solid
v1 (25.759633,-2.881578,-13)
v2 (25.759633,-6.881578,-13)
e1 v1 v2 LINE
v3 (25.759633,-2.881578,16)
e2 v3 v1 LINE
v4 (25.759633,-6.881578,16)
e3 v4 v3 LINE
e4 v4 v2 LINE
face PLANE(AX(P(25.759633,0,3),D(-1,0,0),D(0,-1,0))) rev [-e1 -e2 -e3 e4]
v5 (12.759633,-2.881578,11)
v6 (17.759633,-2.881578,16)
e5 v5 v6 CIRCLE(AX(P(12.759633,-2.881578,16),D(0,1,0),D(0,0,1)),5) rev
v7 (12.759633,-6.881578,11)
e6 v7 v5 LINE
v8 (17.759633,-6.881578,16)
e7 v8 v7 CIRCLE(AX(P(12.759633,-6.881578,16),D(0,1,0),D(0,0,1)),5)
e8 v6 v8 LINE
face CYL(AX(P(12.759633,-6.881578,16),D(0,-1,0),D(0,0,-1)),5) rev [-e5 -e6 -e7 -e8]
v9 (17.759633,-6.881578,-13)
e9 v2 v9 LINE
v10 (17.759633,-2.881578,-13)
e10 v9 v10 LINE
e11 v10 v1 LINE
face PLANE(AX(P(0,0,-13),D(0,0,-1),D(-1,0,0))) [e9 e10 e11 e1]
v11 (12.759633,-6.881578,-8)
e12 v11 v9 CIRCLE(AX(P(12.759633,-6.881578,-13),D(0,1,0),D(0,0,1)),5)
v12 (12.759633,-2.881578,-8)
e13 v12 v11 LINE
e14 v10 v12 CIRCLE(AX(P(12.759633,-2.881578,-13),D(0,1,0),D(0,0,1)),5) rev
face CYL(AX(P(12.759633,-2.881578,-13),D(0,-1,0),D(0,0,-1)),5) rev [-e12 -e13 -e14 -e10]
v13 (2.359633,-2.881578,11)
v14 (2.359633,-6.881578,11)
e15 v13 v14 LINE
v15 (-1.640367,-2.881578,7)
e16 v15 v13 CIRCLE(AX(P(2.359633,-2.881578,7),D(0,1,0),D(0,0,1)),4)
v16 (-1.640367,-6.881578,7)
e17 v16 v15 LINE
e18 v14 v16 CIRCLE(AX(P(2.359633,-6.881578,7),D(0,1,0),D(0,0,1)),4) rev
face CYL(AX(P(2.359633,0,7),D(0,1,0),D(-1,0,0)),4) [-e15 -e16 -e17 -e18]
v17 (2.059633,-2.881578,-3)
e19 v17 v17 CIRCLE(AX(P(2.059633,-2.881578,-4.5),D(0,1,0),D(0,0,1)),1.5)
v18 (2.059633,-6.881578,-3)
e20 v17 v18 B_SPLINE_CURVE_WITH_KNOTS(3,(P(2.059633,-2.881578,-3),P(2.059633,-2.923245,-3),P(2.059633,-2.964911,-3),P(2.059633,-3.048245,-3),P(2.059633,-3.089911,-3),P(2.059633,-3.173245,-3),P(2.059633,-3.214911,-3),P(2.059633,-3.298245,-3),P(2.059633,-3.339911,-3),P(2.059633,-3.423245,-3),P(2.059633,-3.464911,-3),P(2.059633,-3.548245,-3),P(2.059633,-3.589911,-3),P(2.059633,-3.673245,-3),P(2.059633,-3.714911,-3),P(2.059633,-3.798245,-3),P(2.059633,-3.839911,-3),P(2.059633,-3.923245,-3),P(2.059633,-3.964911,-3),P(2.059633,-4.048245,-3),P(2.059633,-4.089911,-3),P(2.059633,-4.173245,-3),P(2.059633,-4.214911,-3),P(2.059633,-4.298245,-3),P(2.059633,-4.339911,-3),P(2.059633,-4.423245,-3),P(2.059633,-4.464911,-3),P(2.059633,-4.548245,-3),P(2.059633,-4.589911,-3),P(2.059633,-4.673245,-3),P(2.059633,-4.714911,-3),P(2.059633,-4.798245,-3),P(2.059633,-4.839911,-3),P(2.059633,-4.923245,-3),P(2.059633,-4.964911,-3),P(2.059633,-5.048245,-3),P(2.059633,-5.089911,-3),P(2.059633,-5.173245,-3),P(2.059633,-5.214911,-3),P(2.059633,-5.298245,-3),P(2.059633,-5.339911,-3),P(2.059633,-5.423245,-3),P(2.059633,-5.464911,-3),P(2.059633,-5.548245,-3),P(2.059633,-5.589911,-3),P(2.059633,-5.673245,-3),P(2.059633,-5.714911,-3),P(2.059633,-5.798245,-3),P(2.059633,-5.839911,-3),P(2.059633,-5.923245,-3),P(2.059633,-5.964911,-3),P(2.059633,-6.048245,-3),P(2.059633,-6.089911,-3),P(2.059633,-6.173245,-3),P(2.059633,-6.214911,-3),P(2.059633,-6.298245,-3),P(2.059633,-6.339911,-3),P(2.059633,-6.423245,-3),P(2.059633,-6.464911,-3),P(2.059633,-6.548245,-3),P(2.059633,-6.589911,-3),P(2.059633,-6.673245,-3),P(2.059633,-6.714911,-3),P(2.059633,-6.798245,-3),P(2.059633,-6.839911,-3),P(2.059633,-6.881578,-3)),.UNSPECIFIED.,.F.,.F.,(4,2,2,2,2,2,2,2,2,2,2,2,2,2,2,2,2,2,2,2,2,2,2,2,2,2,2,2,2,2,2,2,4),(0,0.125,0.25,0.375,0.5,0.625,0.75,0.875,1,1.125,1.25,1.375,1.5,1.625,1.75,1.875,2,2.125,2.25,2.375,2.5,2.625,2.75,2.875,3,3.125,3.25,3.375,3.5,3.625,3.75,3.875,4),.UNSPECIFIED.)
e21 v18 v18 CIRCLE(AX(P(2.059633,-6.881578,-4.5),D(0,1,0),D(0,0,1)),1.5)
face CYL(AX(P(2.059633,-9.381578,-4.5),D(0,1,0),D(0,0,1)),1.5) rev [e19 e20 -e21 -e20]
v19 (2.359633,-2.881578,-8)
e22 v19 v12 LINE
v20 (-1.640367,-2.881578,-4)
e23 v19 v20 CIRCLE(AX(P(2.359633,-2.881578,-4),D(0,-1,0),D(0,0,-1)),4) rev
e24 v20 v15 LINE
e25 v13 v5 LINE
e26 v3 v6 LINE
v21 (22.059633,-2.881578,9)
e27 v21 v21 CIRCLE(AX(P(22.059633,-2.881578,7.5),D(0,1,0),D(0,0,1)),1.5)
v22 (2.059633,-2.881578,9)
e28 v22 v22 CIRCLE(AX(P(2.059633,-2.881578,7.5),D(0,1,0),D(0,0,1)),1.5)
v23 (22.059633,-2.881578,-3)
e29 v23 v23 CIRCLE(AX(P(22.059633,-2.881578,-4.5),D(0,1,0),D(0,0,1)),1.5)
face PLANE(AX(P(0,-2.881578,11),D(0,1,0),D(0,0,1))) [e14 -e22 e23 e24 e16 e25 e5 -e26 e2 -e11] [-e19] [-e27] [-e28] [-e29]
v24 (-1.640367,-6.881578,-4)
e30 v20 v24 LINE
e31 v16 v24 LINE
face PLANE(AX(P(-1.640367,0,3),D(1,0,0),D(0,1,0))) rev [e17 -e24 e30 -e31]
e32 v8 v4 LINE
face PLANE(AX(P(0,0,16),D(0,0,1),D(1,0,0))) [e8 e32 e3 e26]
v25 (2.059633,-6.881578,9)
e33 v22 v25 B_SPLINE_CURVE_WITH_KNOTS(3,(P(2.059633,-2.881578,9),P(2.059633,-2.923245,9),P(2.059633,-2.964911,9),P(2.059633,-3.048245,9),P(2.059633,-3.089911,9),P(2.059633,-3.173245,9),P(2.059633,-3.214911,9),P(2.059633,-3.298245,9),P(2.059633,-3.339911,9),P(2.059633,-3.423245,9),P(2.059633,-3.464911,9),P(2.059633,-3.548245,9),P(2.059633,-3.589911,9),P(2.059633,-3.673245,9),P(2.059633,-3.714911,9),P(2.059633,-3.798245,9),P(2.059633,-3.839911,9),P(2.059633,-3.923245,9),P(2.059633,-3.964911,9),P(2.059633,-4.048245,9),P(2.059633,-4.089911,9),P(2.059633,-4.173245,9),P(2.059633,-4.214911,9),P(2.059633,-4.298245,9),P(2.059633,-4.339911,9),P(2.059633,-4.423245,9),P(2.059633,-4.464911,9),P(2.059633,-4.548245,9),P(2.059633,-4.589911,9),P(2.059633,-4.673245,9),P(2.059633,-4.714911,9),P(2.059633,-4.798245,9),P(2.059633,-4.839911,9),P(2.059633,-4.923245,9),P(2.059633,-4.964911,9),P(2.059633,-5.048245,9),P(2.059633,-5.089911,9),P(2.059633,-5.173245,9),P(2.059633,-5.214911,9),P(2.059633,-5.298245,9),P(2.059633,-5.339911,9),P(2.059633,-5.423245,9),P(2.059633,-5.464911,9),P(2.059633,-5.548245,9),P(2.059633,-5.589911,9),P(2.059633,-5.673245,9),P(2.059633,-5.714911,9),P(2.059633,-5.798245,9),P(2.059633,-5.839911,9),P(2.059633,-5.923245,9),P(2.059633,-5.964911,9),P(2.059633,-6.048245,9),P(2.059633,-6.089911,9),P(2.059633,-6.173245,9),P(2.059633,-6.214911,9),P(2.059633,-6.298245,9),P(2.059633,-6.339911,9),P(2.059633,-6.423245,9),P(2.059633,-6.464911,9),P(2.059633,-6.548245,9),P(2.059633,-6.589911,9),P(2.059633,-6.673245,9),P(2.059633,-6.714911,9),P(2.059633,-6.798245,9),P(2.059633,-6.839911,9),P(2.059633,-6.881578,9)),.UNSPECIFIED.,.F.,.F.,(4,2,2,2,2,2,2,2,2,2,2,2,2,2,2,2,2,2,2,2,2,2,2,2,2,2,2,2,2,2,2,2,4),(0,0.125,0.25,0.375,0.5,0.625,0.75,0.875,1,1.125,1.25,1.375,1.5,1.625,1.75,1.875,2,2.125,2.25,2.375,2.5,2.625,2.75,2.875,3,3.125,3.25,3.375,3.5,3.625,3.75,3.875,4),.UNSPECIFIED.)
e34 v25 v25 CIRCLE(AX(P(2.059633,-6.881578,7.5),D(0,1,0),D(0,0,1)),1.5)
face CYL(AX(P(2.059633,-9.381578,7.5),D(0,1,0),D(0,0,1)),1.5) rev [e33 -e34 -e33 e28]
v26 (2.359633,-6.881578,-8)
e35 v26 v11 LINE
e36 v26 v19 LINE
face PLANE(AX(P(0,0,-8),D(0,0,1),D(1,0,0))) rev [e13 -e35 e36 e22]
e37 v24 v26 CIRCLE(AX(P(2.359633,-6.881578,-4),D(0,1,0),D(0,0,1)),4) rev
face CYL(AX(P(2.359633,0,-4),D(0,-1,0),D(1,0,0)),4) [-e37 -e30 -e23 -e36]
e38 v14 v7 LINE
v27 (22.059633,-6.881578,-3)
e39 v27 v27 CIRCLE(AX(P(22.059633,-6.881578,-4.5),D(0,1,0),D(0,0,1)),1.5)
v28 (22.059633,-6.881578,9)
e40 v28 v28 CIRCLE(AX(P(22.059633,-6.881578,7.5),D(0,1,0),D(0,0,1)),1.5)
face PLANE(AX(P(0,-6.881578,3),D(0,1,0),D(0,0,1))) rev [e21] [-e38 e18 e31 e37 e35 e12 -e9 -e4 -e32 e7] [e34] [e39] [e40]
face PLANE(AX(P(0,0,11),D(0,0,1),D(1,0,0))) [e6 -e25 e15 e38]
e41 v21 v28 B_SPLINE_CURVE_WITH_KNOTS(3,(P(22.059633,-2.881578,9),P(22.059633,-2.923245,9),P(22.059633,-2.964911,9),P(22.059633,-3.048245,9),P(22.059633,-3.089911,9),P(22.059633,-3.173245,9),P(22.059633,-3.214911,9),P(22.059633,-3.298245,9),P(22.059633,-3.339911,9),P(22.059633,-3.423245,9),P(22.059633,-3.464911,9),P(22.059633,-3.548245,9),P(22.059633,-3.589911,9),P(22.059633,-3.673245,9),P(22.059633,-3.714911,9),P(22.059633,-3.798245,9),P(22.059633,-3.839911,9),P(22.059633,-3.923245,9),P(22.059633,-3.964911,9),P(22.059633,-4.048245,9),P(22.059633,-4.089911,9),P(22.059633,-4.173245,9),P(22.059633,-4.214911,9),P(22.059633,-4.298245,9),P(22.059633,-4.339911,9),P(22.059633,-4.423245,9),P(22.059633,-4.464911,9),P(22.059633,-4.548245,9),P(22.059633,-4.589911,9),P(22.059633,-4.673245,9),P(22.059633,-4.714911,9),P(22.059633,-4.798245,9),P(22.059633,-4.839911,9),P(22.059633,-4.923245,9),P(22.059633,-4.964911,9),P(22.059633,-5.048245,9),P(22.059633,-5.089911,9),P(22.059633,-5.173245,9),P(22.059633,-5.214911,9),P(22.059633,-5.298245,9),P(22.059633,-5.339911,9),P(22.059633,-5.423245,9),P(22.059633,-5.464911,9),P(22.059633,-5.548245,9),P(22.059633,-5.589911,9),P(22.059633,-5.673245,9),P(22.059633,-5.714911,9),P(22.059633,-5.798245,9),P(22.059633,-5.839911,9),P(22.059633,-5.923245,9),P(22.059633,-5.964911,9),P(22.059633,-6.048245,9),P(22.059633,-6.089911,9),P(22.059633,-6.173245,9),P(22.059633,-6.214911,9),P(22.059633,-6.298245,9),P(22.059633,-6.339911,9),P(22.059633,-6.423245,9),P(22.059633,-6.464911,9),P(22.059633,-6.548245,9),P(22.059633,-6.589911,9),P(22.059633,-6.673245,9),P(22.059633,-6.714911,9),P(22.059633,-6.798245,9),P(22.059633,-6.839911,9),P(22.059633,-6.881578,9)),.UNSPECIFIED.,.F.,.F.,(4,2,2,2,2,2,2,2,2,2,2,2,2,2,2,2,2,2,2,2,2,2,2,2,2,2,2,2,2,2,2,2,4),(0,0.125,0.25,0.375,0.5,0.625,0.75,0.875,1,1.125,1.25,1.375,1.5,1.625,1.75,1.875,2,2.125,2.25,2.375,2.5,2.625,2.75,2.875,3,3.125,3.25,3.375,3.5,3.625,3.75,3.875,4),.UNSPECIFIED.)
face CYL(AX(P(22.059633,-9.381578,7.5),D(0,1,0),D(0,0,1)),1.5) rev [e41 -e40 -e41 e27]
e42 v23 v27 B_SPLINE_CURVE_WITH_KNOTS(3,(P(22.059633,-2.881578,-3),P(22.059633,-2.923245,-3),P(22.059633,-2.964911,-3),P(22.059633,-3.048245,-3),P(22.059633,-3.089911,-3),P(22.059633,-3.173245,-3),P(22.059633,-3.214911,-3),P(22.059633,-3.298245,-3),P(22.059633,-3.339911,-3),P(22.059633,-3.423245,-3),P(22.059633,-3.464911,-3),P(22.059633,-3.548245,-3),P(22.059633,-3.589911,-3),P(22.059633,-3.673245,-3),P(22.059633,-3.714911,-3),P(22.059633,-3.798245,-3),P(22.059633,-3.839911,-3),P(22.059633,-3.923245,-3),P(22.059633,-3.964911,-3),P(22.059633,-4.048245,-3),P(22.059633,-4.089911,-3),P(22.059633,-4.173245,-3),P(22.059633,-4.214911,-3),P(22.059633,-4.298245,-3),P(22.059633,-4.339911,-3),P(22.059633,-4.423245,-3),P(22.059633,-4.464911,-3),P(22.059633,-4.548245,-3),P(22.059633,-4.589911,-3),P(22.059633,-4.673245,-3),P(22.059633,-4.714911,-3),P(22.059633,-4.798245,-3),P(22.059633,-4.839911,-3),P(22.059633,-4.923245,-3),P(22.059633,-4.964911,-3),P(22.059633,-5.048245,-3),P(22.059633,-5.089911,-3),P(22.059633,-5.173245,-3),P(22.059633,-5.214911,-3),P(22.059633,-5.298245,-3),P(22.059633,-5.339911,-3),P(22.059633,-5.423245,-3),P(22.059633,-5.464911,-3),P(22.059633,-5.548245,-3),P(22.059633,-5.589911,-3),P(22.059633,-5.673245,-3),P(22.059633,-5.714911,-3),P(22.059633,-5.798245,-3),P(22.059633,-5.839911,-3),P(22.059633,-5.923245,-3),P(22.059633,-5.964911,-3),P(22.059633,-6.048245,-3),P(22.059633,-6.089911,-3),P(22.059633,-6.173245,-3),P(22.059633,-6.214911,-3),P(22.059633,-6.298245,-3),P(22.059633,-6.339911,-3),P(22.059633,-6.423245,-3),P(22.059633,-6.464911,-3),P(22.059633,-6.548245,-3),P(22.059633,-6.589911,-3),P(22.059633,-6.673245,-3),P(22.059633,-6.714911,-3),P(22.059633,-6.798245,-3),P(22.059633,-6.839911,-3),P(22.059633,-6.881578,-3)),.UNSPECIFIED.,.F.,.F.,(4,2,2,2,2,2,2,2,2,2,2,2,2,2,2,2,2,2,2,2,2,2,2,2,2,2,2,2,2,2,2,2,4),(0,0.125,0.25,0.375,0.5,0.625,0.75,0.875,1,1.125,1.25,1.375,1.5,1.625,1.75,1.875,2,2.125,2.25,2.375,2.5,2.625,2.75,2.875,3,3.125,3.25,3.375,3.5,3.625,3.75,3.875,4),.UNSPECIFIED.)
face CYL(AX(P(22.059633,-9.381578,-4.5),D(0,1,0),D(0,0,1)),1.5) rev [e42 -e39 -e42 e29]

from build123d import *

# Parameters (mm, degrees)
SKETCH_1_W          = 27.399999997
SKETCH_1_H          = 4
EXTRUDE_1_DEPTH     = 3
SKETCH_1_3_W        = 27.399999997
SKETCH_1_3_H        = 4
EXTRUDE_2_DEPTH     = 11
SKETCH_1_4_W        = 27.399999997
SKETCH_1_4_H        = 4
EXTRUDE_3_DEPTH     = 8
SKETCH_2_R          = 1.5
CUT_EXTRUDE_1_DEPTH = 6.5
FILLET_1_R          = 4
EXTRUDE_4_DEPTH     = 19
SKETCH_6_W          = 32.257266432
SKETCH_6_H          = 23.708854684
CUT_EXTRUDE_2_DEPTH = 21
SKETCH_7_W          = 8
SKETCH_7_H          = 4
EXTRUDE_5_DEPTH     = 5
SKETCH_8_W          = 8
SKETCH_8_H          = 4
EXTRUDE_6_DEPTH     = 5
SKETCH_9_W          = 47.208598766
SKETCH_9_H          = 30.653056474
CUT_EXTRUDE_3_DEPTH = 18
FILLET_2_R          = 5


with BuildPart() as part:
    # 草图1 → 凸台-拉伸1 (new body)
    with BuildSketch(Plane.XY):
        with BuildLine():
            ThreePointArc((-0.337371922, -1.853501365), (-0.488220409, -1.87454383), (-0.640366957, -1.881577989))
            Line((-0.640366957, -1.881577989), (-1.640366957, -1.881577989))
            Line((-1.640366957, -1.881577989), (-1.640366957, -2.881577989))
            Line((-1.640366957, -2.881577989), (25.75963304, -2.881577989))
            Line((25.75963304, -2.881577989), (25.75963304, -1.88157799))
            Line((25.75963304, -1.88157799), (24.75963304, -1.88157799))
            ThreePointArc((24.75963304, -1.88157799), (24.607486492, -1.87454383), (24.456638005, -1.853501365))
            ThreePointArc((24.456638005, -1.853501365), (23.608703525, -1.413476758), (23.147062635, -0.577114262))
            ThreePointArc((23.147062635, -0.577114262), (22.880535784, 0.365382964), (22.493851477, 1.265278974))
            ThreePointArc((22.493851477, 1.265278974), (21.584633042, 1.287629087), (20.675414607, 1.265278974))
            ThreePointArc((20.675414607, 1.265278974), (20.288730299, 0.365382964), (20.022203448, -0.577114261))
            ThreePointArc((20.022203448, -0.577114261), (19.560562558, -1.413476758), (18.712628078, -1.853501365))
            ThreePointArc((18.712628078, -1.853501365), (18.409633042, -1.88157799), (18.106638005, -1.853501365))
            ThreePointArc((18.106638005, -1.853501365), (17.258703525, -1.413476758), (16.797062635, -0.577114262))
            ThreePointArc((16.797062635, -0.577114262), (16.530535784, 0.365382964), (16.143851477, 1.265278974))
            ThreePointArc((16.143851477, 1.265278974), (15.234633042, 1.287629087), (14.325414607, 1.265278974))
            ThreePointArc((14.325414607, 1.265278974), (13.938730299, 0.365382964), (13.672203448, -0.577114261))
            ThreePointArc((13.672203448, -0.577114261), (13.210562558, -1.413476758), (12.362628078, -1.853501365))
            ThreePointArc((12.362628078, -1.853501365), (12.059633042, -1.88157799), (11.756638005, -1.853501365))
            ThreePointArc((11.756638005, -1.853501365), (10.908703525, -1.413476758), (10.447062635, -0.577114262))
            ThreePointArc((10.447062635, -0.577114262), (10.180535784, 0.365382964), (9.793851477, 1.265278974))
            ThreePointArc((9.793851477, 1.265278974), (8.884633042, 1.287629087), (7.975414607, 1.265278974))
            ThreePointArc((7.975414607, 1.265278974), (7.588730299, 0.365382964), (7.322203448, -0.577114261))
            ThreePointArc((7.322203448, -0.577114261), (6.860562558, -1.413476758), (6.012628078, -1.853501365))
            ThreePointArc((6.012628078, -1.853501365), (5.709633042, -1.88157799), (5.406638005, -1.853501365))
            ThreePointArc((5.406638005, -1.853501365), (4.558703525, -1.413476758), (4.097062635, -0.577114262))
            ThreePointArc((4.097062635, -0.577114262), (3.830535784, 0.365382964), (3.443851477, 1.265278974))
            ThreePointArc((3.443851477, 1.265278974), (2.534633042, 1.287629087), (1.625414607, 1.265278974))
            ThreePointArc((1.625414607, 1.265278974), (1.238730299, 0.365382964), (0.972203448, -0.577114261))
            ThreePointArc((0.972203448, -0.577114261), (0.510562558, -1.413476758), (-0.337371922, -1.853501365))
        make_face()
        with Locations((12.059633041, -4.881577989)):
            Rectangle(SKETCH_1_W, SKETCH_1_H)
    extrude(amount=EXTRUDE_1_DEPTH)

    # 草图1<3> → 凸台-拉伸2 (add)
    with BuildSketch(Plane.XY):
        with Locations((12.059633041, -4.881577989)):
            Rectangle(SKETCH_1_3_W, SKETCH_1_3_H)
    extrude(amount=EXTRUDE_2_DEPTH)

    # 草图1<4> → 凸台-拉伸3 (add)
    with BuildSketch(Plane.XY):
        with Locations((12.059633041, -4.881577989)):
            Rectangle(SKETCH_1_4_W, SKETCH_1_4_H)
    extrude(amount=-EXTRUDE_3_DEPTH)

    # 草图2 → 切除-拉伸1 (cut)
    with BuildSketch(Plane(origin=(0, -2.881577989, 0), x_dir=(1, 0, 0), z_dir=(0, 1, 0))):
        with Locations(Location((2.059633042, 4.5, 0), (0, 0, 270))):
            Circle(SKETCH_2_R)
        with Locations(Location((22.059633042, 4.5, 0), (0, 0, 270))):
            Circle(SKETCH_2_R)
        with Locations(Location((22.059633042, -7.5, 0), (0, 0, 270))):
            Circle(SKETCH_2_R)
        with Locations(Location((2.059633042, -7.5, 0), (0, 0, 270))):
            Circle(SKETCH_2_R)
    extrude(amount=-CUT_EXTRUDE_1_DEPTH, mode=Mode.SUBTRACT)

    # 圆角1
    fillet_1_edges = [part.edges().sort_by_distance(p)[0] for p in [
        (-1.640366957, -4.881577989, 11),
        (-1.640366957, -4.881577989, -8),
    ]]
    fillet(fillet_1_edges, radius=FILLET_1_R)

    # 草图4 → 凸台-拉伸4 (add)
    with BuildSketch(Plane(origin=(0, 0, -8), x_dir=(-1, 0, 0), z_dir=(0, 0, -1))):
        with BuildLine():
            Line((-11.559633042, -6.881577989), (-16.559633042, -6.881577989))
            Line((-16.559633042, -6.881577989), (-16.559633042, -12.881577989))
            ThreePointArc((-16.559633042, -12.881577989), (-11.842889335, -20.796987993), (-2.636585146, -20.415740147))
            Line((-2.636585146, -20.415740147), (-2.636585146, -19.612245623))
            ThreePointArc((-2.636585146, -19.612245623), (-8.775001634, -18.470018526), (-11.559633042, -12.881577989))
            Line((-11.559633042, -12.881577989), (-11.559633042, -6.881577989))
        make_face()
    extrude(amount=-EXTRUDE_4_DEPTH)

    # 草图6 → 切除-拉伸2 (cut)
    with BuildSketch(Plane.XZ.offset(6.881577989)):
        with Locations((13.405653676, 0.508195322)):
            Rectangle(SKETCH_6_W, SKETCH_6_H)
    extrude(amount=CUT_EXTRUDE_2_DEPTH, mode=Mode.SUBTRACT)

    # 草图7 → 凸台-拉伸5 (add)
    with BuildSketch(Plane.XY.offset(11)):
        with Locations((21.75963304, -4.881577989)):
            Rectangle(SKETCH_7_W, SKETCH_7_H)
    extrude(amount=EXTRUDE_5_DEPTH)

    # 草图8 → 凸台-拉伸6 (add)
    with BuildSketch(Plane(origin=(0, 0, -8), x_dir=(-1, 0, 0), z_dir=(0, 0, -1))):
        with Locations((-21.75963304, -4.881577989)):
            Rectangle(SKETCH_8_W, SKETCH_8_H)
    extrude(amount=EXTRUDE_6_DEPTH)

    # 草图9 → 切除-拉伸3 (cut)
    with BuildSketch(Plane(origin=(0, -2.881577989, 0), x_dir=(1, 0, 0), z_dir=(0, 1, 0))):
        with Locations((10.799915409, -0.879700666)):
            Rectangle(SKETCH_9_W, SKETCH_9_H)
    extrude(amount=CUT_EXTRUDE_3_DEPTH, mode=Mode.SUBTRACT)

    # 圆角2
    fillet_2_edges = [part.edges().sort_by_distance(p)[0] for p in [
        (17.75963304, -4.881577989, 11),
        (17.75963304, -4.881577989, -8),
    ]]
    fillet(fillet_2_edges, radius=FILLET_2_R - 0.0001)  # a hair under: the kernel refuses the full size


solid = part.part
